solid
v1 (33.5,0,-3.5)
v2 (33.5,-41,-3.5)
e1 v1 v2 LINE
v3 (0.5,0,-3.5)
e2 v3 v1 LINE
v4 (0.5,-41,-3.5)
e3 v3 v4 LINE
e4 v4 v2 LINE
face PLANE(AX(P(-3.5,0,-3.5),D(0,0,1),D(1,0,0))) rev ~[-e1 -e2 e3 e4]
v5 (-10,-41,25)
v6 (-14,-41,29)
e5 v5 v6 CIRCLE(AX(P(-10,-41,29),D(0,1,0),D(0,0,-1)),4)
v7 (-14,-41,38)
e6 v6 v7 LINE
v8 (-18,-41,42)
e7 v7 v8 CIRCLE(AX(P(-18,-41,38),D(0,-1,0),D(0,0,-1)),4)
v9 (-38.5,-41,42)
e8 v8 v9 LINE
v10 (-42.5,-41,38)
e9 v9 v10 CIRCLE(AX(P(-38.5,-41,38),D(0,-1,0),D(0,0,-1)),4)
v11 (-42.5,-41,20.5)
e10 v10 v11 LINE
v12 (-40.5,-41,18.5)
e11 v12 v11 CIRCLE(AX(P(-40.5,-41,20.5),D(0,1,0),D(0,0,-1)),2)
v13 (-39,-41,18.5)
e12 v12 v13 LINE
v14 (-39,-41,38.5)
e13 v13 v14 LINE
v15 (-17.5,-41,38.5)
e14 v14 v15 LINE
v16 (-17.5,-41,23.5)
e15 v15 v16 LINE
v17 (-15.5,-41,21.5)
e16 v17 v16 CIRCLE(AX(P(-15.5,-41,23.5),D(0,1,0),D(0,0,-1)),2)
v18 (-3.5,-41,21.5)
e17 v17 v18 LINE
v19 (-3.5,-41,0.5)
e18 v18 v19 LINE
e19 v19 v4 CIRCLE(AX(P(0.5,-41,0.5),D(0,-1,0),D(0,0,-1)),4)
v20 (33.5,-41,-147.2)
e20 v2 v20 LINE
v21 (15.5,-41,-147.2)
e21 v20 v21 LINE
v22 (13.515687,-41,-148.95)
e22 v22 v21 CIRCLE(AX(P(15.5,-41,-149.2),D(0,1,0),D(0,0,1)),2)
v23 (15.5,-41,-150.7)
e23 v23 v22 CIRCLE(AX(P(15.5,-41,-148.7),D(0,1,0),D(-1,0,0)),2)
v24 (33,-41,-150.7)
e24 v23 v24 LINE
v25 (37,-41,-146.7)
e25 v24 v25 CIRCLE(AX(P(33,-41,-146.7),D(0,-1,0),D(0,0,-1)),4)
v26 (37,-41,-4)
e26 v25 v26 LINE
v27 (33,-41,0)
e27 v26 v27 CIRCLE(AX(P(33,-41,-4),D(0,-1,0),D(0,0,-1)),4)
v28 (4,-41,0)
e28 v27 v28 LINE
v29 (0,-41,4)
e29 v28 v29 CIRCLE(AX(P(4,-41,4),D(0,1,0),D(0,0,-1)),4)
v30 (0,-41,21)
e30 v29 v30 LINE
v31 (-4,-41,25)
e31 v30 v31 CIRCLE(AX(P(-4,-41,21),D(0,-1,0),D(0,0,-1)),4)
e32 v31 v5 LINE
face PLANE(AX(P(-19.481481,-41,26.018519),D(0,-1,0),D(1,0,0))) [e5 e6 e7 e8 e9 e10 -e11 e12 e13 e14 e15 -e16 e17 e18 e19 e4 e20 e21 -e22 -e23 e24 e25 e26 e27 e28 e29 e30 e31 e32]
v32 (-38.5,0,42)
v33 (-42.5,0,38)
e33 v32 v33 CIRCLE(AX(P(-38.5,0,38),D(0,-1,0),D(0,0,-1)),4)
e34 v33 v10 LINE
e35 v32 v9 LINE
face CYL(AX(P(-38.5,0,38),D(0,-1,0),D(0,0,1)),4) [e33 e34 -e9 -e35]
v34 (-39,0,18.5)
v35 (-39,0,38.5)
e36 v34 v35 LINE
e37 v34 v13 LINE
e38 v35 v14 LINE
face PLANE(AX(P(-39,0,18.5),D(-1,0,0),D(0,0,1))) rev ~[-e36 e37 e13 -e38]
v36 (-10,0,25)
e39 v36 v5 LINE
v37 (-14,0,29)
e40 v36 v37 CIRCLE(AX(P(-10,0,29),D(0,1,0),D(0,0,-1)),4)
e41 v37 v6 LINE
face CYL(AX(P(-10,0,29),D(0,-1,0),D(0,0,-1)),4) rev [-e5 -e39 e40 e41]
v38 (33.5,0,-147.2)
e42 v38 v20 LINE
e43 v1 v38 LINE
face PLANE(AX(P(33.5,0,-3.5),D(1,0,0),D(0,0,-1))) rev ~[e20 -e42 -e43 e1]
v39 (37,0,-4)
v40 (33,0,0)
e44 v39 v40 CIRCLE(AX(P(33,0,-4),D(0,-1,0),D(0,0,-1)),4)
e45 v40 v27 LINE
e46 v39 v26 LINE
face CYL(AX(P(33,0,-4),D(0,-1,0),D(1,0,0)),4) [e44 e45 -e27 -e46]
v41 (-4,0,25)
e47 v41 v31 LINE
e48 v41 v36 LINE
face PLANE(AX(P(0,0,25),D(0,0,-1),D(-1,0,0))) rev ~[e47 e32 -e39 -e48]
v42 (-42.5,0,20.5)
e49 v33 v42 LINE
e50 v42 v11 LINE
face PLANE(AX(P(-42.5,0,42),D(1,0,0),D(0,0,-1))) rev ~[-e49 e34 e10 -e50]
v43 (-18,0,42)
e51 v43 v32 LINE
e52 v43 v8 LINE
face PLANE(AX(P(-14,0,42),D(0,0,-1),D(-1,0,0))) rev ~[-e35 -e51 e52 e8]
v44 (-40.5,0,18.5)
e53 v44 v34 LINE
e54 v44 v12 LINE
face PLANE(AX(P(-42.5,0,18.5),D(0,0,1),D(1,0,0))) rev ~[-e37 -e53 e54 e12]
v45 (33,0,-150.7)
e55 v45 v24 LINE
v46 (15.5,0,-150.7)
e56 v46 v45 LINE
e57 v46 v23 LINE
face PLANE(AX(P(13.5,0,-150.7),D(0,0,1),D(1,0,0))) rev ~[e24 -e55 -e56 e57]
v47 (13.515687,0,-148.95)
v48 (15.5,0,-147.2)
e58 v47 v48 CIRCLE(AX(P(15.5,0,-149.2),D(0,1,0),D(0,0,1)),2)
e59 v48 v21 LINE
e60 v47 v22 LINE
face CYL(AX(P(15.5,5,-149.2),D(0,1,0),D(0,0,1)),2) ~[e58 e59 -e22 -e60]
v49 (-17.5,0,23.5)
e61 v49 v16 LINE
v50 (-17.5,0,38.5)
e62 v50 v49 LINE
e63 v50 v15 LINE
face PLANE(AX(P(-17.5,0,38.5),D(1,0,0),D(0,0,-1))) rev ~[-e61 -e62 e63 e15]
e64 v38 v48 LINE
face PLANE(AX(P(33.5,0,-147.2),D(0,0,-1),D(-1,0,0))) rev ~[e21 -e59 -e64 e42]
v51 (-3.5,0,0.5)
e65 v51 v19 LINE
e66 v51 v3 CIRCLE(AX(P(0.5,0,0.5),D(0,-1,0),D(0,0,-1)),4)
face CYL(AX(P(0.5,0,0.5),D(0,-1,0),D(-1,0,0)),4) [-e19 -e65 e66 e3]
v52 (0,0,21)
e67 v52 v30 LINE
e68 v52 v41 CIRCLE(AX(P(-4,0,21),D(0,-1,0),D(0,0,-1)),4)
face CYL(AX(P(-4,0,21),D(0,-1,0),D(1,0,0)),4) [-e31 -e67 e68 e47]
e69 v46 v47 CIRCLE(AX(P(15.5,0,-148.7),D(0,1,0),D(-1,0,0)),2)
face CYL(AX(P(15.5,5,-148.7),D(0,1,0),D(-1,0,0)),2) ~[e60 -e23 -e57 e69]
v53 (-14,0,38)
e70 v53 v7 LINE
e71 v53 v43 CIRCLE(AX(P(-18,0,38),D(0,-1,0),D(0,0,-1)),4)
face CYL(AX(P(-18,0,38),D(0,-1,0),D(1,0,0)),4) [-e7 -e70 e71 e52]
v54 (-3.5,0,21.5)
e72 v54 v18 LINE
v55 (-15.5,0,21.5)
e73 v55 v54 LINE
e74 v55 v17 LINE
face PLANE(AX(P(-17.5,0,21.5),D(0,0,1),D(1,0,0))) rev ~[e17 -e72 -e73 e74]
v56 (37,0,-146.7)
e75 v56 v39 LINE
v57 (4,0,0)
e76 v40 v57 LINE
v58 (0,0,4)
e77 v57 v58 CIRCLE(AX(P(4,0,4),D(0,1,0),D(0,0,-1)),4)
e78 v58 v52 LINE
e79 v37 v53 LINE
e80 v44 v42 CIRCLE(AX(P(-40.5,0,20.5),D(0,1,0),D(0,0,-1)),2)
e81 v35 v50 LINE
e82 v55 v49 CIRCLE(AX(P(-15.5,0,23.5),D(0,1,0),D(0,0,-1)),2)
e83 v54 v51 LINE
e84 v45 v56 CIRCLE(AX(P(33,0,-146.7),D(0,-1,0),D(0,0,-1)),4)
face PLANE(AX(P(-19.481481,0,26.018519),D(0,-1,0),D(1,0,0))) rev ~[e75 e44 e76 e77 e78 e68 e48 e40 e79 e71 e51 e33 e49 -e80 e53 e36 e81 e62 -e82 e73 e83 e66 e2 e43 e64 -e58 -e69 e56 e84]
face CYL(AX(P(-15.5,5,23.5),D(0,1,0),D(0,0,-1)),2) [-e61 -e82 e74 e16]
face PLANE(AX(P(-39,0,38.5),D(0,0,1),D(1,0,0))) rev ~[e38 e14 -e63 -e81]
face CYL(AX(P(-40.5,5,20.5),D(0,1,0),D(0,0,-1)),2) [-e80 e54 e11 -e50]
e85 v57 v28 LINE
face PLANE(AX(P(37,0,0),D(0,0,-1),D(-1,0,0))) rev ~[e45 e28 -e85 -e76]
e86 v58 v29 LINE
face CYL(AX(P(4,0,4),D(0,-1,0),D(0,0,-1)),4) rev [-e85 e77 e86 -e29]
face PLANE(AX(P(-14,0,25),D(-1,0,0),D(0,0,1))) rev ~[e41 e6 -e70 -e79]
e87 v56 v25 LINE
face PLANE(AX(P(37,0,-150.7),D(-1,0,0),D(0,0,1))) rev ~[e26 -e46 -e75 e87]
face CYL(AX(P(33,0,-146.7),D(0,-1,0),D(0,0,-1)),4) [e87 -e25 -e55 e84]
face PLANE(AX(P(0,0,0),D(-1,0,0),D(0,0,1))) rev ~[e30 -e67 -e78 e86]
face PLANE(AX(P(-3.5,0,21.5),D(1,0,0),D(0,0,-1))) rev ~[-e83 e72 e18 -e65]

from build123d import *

# Parameters (mm, degrees)
F1_DEPTH    = 41
F2_R        = 4
F3_T1_DEPTH = 51


# Not quite as in the source:
# - a fillet or chamfer that OpenCascade refuses, or shapes differently, is made with other operations: its cross-section is extruded or revolved along the edge and cut away or added


with BuildPart() as f1:
    # F0 (on Front) → F1 (new body)
    with BuildSketch(Plane.XZ):
        Polygon((-42.5, 18.5), (-39, 18.5), (-39, 38.5), (-17.5, 38.5), (-17.5, 21.5), (-3.5, 21.5), (-3.5, -3.5), (0, -3.5), (0, 0), (0, 25), (-14, 25), (-14, 42), (-42.5, 42), align=None)
        Polygon((0, 0), (0, -3.5), (33.5, -3.5), (33.5, -147.2), (13.5, -147.2), (13.5, -150.7), (37, -150.7), (37, 0), align=None)
    extrude(amount=F1_DEPTH)

    # F2
    f2_edges = [f1.edges().sort_by_distance(p)[0] for p in [
        (-42.5, -20.5, 42),
        (-14, -20.5, 42),
        (0, -20.5, 25),
        (0, -20.5, 0),
        (-14, -20.5, 25),
        (37, -20.5, 0),
        (37, -20.5, -150.7),
        (-3.5, -20.5, -3.5),
    ]]
    fillet(f2_edges, radius=F2_R)

    # F3: fillet of radius 2 on 4 edges, made by hand

    # F3_s2 → F3_t1 (cut)
    with BuildSketch(Plane.XZ.offset(-5)):
        with BuildLine():
            ThreePointArc((-40.5, 18.5), (-41.9142135624, 19.0857864376), (-42.5, 20.5))
            Line((-42.5, 20.5), (-42.5, 18.5))
            Line((-42.5, 18.5), (-40.5, 18.5))
        make_face()
        with BuildLine():
            ThreePointArc((15.5, -147.2), (14.0857864376, -147.7857864376), (13.5, -149.2))
            Line((13.5, -149.2), (13.5, -147.2))
            Line((13.5, -147.2), (15.5, -147.2))
        make_face()
        with BuildLine():
            ThreePointArc((13.5, -148.7), (14.0857864376, -150.1142135624), (15.5, -150.7))
            Line((15.5, -150.7), (13.5, -150.7))
            Line((13.5, -150.7), (13.5, -148.7))
        make_face()
        with BuildLine():
            ThreePointArc((-15.5, 21.5), (-16.9142135624, 22.0857864376), (-17.5, 23.5))
            Line((-17.5, 23.5), (-17.5, 21.5))
            Line((-17.5, 21.5), (-15.5, 21.5))
        make_face()
    extrude(amount=F3_T1_DEPTH, mode=Mode.SUBTRACT)


solid = f1.part
